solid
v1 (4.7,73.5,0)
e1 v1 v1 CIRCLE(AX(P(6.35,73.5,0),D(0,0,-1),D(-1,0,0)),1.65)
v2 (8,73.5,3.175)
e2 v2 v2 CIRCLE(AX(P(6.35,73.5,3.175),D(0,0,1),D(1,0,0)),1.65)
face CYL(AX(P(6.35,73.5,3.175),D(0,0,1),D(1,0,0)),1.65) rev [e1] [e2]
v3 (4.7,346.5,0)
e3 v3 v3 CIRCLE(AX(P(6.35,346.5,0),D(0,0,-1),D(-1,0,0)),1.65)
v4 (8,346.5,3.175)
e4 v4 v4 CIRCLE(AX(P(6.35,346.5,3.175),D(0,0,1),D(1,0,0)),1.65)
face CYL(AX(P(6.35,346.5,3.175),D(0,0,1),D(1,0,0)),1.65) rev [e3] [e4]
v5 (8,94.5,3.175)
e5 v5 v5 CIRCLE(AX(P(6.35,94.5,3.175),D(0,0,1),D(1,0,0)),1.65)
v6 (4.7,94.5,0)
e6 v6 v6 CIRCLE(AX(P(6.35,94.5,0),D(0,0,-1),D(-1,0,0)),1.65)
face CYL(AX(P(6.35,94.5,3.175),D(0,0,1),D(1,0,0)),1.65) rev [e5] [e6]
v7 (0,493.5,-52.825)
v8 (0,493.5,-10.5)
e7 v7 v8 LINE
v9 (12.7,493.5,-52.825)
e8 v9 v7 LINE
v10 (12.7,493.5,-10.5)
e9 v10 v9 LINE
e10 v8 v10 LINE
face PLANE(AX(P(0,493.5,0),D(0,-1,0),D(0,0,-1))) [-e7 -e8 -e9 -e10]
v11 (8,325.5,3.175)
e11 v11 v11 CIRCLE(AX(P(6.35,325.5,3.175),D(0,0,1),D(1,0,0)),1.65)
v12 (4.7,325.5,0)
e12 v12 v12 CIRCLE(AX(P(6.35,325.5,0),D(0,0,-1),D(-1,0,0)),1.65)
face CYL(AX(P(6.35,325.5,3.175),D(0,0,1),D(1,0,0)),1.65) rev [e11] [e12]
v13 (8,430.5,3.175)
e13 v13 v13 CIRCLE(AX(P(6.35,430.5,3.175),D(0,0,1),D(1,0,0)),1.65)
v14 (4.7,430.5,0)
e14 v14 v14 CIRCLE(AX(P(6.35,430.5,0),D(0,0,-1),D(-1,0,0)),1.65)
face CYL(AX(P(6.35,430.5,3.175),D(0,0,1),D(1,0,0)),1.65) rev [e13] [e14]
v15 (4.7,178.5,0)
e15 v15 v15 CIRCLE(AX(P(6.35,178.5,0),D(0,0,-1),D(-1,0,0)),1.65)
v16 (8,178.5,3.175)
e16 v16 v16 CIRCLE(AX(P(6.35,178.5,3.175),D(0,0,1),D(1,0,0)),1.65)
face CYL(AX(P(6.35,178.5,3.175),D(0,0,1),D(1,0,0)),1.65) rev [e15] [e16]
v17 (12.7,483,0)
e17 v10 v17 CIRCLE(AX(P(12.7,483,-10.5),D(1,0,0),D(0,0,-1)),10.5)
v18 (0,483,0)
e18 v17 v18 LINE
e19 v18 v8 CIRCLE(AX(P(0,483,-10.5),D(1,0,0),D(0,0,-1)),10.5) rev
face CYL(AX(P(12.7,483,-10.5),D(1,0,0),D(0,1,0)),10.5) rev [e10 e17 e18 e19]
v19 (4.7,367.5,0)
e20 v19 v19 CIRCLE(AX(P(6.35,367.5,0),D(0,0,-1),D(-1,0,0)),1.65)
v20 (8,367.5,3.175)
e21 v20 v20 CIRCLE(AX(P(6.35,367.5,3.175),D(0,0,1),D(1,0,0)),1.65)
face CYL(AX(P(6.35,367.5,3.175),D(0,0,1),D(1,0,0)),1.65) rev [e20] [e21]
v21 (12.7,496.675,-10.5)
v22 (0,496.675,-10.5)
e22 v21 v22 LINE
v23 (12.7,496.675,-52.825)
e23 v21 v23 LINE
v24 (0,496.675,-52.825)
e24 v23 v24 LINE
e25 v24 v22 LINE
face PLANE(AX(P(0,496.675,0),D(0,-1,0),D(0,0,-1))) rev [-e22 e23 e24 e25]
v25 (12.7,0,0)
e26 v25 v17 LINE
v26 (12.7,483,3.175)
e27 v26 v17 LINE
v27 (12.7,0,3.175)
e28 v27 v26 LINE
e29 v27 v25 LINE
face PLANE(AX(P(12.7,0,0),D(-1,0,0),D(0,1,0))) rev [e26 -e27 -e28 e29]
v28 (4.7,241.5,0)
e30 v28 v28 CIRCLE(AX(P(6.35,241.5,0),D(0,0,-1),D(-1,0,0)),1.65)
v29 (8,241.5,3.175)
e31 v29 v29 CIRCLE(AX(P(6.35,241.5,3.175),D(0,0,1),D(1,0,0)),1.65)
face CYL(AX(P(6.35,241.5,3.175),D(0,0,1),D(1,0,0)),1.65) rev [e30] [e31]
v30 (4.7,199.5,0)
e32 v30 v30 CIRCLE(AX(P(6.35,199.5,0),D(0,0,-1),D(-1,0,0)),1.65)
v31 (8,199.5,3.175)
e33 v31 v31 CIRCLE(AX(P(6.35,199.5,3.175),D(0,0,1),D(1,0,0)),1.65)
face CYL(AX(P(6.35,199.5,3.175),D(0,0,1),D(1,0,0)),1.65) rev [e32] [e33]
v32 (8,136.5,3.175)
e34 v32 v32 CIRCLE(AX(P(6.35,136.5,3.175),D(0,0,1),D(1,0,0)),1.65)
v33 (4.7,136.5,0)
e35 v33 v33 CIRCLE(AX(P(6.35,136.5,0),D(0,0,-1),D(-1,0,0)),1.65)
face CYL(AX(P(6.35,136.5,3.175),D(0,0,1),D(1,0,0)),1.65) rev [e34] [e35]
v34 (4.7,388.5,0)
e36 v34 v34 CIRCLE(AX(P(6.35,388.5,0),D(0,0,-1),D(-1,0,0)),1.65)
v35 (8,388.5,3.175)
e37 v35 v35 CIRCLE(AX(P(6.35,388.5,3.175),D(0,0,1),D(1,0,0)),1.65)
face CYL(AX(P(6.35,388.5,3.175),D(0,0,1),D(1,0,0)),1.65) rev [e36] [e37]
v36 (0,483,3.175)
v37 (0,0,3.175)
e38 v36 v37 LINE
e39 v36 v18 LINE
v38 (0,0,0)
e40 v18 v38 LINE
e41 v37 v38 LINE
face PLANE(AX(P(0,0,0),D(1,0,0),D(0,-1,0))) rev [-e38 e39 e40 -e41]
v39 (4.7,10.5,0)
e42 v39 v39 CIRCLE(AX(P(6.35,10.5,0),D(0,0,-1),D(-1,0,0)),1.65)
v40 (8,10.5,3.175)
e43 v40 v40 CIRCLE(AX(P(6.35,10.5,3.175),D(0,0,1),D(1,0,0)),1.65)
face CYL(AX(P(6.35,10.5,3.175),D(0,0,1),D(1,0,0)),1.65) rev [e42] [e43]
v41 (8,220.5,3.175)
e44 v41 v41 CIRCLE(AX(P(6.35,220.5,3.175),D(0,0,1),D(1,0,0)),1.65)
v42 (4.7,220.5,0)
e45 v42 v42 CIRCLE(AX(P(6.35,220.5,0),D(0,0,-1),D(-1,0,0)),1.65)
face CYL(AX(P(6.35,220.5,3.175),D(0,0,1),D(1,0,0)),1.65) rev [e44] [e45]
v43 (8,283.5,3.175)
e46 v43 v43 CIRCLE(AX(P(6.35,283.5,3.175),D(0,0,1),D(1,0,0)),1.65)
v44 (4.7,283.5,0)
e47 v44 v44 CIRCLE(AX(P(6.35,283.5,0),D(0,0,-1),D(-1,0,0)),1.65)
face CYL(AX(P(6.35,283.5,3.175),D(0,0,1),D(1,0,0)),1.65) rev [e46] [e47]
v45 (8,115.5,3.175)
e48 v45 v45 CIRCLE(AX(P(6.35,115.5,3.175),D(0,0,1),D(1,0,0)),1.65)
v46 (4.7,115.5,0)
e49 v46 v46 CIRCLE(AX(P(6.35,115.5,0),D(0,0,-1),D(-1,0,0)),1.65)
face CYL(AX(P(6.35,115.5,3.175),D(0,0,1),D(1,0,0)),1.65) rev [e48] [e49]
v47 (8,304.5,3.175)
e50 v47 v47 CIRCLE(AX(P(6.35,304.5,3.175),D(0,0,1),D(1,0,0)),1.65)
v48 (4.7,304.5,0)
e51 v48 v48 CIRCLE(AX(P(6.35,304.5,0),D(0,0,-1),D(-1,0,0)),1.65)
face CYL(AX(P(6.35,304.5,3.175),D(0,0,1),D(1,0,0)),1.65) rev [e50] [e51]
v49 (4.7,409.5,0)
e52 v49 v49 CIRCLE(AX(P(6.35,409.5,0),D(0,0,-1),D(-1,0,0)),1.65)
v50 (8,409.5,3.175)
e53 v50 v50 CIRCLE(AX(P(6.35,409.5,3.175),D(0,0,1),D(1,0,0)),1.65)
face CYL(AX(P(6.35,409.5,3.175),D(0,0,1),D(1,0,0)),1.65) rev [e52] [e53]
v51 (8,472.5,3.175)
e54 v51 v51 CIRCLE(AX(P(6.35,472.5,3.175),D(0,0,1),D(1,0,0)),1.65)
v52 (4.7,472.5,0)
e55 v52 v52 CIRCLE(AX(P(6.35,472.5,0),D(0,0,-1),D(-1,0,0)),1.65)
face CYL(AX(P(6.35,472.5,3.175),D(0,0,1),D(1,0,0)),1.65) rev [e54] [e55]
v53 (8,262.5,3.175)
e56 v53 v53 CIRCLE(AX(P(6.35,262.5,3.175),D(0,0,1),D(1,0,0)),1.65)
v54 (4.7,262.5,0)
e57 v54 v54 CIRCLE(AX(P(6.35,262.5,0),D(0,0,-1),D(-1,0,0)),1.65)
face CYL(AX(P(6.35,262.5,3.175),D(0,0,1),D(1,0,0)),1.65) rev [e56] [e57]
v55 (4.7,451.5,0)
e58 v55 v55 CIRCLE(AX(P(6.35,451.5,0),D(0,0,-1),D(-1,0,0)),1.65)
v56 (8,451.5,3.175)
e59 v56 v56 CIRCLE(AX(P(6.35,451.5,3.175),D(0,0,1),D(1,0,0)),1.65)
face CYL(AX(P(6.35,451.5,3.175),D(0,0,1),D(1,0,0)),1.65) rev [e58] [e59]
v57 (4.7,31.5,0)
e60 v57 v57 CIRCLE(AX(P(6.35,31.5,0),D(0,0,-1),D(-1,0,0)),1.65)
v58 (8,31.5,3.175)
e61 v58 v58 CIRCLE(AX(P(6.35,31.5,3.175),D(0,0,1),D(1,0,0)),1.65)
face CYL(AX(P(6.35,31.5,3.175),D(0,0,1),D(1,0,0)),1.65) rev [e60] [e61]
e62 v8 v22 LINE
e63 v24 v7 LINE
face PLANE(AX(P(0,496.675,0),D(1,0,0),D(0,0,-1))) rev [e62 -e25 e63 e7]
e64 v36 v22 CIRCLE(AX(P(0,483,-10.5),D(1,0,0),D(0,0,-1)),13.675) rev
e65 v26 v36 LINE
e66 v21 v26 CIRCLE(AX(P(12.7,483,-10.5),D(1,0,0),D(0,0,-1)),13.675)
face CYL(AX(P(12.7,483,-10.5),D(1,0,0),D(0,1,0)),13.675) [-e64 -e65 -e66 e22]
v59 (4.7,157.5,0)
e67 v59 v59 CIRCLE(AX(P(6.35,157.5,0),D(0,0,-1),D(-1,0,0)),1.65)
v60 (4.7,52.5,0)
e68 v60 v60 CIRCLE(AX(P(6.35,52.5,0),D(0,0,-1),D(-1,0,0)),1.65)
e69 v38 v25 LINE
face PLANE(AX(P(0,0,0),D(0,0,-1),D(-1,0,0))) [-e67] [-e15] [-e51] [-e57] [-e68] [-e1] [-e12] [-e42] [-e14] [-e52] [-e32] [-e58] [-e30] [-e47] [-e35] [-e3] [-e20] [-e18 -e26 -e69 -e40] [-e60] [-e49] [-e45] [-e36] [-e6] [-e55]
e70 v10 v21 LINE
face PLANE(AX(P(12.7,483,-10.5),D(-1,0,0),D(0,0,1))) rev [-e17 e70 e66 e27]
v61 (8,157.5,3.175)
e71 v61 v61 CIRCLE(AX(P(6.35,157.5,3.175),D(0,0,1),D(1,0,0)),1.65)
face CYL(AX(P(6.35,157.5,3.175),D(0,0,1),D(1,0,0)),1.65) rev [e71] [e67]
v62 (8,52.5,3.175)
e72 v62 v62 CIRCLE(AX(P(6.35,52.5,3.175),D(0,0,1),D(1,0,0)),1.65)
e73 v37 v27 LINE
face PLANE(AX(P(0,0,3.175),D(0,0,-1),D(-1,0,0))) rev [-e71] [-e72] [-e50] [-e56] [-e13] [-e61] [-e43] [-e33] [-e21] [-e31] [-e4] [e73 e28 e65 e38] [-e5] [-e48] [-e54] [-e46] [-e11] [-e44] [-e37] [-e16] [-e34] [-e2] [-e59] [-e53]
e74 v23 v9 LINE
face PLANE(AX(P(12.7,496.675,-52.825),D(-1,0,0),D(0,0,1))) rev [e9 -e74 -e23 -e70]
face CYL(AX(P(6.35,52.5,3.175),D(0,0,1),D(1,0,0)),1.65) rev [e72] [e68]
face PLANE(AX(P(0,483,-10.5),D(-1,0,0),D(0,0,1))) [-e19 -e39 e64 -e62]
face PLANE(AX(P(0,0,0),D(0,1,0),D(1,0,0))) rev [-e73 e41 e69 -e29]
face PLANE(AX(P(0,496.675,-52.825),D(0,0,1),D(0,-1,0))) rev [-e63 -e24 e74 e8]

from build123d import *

# Parameters (mm, degrees)
SKETCH1_W                   = 12.7
SKETCH1_H                   = 483
BOSS_EXTRUDE1_DEPTH         = 3.175
EDGE_FLANGE1_DEPTH          = 12.7
TAP_DRILL_FOR_M4X0_7_TAP1_D = 3.3


# Sheet-metal steps are written as plain solids
with BuildPart() as part:
    # Sketch1 → Boss-Extrude1 (new body)
    with BuildSketch(Plane.XY):
        with Locations((6.35, 241.5)):
            Rectangle(SKETCH1_W, SKETCH1_H)
    extrude(amount=BOSS_EXTRUDE1_DEPTH)

    # Edge-Flange1 section (across the edge) → Edge-Flange1 (add)
    with BuildSketch(Plane(origin=(0, 493.5, 0), x_dir=(0, -1, 0), z_dir=(1, 0, 0))):
        with BuildLine():
            Line((-3.175, 10.5), (-3.175, 52.825))
            Line((-3.175, 52.825), (0, 52.825))
            Line((0, 52.825), (0, 10.5))
            ThreePointArc((0, 10.5), (3.075378798, 3.075378798), (10.5, 0))
            Line((10.5, 0), (10.5, -3.175))
            ThreePointArc((10.5, -3.175), (0.830314767, 0.830314767), (-3.175, 10.5))
        make_face()
    extrude(amount=EDGE_FLANGE1_DEPTH)

    # Tap Drill for M4x0.7 Tap1 (through all)
    with Locations(Plane.XY.offset(3.175)):
        with Locations((6.35, 10.5), (6.35, 31.5), (6.35, 52.5), (6.35, 73.5), (6.35, 94.5), (6.35, 115.5), (6.35, 136.5), (6.35, 157.5), (6.35, 178.5), (6.35, 199.5), (6.35, 220.5), (6.35, 241.5), (6.35, 262.5), (6.35, 283.5), (6.35, 304.5), (6.35, 325.5), (6.35, 346.5), (6.35, 367.5), (6.35, 388.5), (6.35, 409.5), (6.35, 430.5), (6.35, 451.5), (6.35, 472.5)):
            Hole(TAP_DRILL_FOR_M4X0_7_TAP1_D / 2)


solid = part.part
